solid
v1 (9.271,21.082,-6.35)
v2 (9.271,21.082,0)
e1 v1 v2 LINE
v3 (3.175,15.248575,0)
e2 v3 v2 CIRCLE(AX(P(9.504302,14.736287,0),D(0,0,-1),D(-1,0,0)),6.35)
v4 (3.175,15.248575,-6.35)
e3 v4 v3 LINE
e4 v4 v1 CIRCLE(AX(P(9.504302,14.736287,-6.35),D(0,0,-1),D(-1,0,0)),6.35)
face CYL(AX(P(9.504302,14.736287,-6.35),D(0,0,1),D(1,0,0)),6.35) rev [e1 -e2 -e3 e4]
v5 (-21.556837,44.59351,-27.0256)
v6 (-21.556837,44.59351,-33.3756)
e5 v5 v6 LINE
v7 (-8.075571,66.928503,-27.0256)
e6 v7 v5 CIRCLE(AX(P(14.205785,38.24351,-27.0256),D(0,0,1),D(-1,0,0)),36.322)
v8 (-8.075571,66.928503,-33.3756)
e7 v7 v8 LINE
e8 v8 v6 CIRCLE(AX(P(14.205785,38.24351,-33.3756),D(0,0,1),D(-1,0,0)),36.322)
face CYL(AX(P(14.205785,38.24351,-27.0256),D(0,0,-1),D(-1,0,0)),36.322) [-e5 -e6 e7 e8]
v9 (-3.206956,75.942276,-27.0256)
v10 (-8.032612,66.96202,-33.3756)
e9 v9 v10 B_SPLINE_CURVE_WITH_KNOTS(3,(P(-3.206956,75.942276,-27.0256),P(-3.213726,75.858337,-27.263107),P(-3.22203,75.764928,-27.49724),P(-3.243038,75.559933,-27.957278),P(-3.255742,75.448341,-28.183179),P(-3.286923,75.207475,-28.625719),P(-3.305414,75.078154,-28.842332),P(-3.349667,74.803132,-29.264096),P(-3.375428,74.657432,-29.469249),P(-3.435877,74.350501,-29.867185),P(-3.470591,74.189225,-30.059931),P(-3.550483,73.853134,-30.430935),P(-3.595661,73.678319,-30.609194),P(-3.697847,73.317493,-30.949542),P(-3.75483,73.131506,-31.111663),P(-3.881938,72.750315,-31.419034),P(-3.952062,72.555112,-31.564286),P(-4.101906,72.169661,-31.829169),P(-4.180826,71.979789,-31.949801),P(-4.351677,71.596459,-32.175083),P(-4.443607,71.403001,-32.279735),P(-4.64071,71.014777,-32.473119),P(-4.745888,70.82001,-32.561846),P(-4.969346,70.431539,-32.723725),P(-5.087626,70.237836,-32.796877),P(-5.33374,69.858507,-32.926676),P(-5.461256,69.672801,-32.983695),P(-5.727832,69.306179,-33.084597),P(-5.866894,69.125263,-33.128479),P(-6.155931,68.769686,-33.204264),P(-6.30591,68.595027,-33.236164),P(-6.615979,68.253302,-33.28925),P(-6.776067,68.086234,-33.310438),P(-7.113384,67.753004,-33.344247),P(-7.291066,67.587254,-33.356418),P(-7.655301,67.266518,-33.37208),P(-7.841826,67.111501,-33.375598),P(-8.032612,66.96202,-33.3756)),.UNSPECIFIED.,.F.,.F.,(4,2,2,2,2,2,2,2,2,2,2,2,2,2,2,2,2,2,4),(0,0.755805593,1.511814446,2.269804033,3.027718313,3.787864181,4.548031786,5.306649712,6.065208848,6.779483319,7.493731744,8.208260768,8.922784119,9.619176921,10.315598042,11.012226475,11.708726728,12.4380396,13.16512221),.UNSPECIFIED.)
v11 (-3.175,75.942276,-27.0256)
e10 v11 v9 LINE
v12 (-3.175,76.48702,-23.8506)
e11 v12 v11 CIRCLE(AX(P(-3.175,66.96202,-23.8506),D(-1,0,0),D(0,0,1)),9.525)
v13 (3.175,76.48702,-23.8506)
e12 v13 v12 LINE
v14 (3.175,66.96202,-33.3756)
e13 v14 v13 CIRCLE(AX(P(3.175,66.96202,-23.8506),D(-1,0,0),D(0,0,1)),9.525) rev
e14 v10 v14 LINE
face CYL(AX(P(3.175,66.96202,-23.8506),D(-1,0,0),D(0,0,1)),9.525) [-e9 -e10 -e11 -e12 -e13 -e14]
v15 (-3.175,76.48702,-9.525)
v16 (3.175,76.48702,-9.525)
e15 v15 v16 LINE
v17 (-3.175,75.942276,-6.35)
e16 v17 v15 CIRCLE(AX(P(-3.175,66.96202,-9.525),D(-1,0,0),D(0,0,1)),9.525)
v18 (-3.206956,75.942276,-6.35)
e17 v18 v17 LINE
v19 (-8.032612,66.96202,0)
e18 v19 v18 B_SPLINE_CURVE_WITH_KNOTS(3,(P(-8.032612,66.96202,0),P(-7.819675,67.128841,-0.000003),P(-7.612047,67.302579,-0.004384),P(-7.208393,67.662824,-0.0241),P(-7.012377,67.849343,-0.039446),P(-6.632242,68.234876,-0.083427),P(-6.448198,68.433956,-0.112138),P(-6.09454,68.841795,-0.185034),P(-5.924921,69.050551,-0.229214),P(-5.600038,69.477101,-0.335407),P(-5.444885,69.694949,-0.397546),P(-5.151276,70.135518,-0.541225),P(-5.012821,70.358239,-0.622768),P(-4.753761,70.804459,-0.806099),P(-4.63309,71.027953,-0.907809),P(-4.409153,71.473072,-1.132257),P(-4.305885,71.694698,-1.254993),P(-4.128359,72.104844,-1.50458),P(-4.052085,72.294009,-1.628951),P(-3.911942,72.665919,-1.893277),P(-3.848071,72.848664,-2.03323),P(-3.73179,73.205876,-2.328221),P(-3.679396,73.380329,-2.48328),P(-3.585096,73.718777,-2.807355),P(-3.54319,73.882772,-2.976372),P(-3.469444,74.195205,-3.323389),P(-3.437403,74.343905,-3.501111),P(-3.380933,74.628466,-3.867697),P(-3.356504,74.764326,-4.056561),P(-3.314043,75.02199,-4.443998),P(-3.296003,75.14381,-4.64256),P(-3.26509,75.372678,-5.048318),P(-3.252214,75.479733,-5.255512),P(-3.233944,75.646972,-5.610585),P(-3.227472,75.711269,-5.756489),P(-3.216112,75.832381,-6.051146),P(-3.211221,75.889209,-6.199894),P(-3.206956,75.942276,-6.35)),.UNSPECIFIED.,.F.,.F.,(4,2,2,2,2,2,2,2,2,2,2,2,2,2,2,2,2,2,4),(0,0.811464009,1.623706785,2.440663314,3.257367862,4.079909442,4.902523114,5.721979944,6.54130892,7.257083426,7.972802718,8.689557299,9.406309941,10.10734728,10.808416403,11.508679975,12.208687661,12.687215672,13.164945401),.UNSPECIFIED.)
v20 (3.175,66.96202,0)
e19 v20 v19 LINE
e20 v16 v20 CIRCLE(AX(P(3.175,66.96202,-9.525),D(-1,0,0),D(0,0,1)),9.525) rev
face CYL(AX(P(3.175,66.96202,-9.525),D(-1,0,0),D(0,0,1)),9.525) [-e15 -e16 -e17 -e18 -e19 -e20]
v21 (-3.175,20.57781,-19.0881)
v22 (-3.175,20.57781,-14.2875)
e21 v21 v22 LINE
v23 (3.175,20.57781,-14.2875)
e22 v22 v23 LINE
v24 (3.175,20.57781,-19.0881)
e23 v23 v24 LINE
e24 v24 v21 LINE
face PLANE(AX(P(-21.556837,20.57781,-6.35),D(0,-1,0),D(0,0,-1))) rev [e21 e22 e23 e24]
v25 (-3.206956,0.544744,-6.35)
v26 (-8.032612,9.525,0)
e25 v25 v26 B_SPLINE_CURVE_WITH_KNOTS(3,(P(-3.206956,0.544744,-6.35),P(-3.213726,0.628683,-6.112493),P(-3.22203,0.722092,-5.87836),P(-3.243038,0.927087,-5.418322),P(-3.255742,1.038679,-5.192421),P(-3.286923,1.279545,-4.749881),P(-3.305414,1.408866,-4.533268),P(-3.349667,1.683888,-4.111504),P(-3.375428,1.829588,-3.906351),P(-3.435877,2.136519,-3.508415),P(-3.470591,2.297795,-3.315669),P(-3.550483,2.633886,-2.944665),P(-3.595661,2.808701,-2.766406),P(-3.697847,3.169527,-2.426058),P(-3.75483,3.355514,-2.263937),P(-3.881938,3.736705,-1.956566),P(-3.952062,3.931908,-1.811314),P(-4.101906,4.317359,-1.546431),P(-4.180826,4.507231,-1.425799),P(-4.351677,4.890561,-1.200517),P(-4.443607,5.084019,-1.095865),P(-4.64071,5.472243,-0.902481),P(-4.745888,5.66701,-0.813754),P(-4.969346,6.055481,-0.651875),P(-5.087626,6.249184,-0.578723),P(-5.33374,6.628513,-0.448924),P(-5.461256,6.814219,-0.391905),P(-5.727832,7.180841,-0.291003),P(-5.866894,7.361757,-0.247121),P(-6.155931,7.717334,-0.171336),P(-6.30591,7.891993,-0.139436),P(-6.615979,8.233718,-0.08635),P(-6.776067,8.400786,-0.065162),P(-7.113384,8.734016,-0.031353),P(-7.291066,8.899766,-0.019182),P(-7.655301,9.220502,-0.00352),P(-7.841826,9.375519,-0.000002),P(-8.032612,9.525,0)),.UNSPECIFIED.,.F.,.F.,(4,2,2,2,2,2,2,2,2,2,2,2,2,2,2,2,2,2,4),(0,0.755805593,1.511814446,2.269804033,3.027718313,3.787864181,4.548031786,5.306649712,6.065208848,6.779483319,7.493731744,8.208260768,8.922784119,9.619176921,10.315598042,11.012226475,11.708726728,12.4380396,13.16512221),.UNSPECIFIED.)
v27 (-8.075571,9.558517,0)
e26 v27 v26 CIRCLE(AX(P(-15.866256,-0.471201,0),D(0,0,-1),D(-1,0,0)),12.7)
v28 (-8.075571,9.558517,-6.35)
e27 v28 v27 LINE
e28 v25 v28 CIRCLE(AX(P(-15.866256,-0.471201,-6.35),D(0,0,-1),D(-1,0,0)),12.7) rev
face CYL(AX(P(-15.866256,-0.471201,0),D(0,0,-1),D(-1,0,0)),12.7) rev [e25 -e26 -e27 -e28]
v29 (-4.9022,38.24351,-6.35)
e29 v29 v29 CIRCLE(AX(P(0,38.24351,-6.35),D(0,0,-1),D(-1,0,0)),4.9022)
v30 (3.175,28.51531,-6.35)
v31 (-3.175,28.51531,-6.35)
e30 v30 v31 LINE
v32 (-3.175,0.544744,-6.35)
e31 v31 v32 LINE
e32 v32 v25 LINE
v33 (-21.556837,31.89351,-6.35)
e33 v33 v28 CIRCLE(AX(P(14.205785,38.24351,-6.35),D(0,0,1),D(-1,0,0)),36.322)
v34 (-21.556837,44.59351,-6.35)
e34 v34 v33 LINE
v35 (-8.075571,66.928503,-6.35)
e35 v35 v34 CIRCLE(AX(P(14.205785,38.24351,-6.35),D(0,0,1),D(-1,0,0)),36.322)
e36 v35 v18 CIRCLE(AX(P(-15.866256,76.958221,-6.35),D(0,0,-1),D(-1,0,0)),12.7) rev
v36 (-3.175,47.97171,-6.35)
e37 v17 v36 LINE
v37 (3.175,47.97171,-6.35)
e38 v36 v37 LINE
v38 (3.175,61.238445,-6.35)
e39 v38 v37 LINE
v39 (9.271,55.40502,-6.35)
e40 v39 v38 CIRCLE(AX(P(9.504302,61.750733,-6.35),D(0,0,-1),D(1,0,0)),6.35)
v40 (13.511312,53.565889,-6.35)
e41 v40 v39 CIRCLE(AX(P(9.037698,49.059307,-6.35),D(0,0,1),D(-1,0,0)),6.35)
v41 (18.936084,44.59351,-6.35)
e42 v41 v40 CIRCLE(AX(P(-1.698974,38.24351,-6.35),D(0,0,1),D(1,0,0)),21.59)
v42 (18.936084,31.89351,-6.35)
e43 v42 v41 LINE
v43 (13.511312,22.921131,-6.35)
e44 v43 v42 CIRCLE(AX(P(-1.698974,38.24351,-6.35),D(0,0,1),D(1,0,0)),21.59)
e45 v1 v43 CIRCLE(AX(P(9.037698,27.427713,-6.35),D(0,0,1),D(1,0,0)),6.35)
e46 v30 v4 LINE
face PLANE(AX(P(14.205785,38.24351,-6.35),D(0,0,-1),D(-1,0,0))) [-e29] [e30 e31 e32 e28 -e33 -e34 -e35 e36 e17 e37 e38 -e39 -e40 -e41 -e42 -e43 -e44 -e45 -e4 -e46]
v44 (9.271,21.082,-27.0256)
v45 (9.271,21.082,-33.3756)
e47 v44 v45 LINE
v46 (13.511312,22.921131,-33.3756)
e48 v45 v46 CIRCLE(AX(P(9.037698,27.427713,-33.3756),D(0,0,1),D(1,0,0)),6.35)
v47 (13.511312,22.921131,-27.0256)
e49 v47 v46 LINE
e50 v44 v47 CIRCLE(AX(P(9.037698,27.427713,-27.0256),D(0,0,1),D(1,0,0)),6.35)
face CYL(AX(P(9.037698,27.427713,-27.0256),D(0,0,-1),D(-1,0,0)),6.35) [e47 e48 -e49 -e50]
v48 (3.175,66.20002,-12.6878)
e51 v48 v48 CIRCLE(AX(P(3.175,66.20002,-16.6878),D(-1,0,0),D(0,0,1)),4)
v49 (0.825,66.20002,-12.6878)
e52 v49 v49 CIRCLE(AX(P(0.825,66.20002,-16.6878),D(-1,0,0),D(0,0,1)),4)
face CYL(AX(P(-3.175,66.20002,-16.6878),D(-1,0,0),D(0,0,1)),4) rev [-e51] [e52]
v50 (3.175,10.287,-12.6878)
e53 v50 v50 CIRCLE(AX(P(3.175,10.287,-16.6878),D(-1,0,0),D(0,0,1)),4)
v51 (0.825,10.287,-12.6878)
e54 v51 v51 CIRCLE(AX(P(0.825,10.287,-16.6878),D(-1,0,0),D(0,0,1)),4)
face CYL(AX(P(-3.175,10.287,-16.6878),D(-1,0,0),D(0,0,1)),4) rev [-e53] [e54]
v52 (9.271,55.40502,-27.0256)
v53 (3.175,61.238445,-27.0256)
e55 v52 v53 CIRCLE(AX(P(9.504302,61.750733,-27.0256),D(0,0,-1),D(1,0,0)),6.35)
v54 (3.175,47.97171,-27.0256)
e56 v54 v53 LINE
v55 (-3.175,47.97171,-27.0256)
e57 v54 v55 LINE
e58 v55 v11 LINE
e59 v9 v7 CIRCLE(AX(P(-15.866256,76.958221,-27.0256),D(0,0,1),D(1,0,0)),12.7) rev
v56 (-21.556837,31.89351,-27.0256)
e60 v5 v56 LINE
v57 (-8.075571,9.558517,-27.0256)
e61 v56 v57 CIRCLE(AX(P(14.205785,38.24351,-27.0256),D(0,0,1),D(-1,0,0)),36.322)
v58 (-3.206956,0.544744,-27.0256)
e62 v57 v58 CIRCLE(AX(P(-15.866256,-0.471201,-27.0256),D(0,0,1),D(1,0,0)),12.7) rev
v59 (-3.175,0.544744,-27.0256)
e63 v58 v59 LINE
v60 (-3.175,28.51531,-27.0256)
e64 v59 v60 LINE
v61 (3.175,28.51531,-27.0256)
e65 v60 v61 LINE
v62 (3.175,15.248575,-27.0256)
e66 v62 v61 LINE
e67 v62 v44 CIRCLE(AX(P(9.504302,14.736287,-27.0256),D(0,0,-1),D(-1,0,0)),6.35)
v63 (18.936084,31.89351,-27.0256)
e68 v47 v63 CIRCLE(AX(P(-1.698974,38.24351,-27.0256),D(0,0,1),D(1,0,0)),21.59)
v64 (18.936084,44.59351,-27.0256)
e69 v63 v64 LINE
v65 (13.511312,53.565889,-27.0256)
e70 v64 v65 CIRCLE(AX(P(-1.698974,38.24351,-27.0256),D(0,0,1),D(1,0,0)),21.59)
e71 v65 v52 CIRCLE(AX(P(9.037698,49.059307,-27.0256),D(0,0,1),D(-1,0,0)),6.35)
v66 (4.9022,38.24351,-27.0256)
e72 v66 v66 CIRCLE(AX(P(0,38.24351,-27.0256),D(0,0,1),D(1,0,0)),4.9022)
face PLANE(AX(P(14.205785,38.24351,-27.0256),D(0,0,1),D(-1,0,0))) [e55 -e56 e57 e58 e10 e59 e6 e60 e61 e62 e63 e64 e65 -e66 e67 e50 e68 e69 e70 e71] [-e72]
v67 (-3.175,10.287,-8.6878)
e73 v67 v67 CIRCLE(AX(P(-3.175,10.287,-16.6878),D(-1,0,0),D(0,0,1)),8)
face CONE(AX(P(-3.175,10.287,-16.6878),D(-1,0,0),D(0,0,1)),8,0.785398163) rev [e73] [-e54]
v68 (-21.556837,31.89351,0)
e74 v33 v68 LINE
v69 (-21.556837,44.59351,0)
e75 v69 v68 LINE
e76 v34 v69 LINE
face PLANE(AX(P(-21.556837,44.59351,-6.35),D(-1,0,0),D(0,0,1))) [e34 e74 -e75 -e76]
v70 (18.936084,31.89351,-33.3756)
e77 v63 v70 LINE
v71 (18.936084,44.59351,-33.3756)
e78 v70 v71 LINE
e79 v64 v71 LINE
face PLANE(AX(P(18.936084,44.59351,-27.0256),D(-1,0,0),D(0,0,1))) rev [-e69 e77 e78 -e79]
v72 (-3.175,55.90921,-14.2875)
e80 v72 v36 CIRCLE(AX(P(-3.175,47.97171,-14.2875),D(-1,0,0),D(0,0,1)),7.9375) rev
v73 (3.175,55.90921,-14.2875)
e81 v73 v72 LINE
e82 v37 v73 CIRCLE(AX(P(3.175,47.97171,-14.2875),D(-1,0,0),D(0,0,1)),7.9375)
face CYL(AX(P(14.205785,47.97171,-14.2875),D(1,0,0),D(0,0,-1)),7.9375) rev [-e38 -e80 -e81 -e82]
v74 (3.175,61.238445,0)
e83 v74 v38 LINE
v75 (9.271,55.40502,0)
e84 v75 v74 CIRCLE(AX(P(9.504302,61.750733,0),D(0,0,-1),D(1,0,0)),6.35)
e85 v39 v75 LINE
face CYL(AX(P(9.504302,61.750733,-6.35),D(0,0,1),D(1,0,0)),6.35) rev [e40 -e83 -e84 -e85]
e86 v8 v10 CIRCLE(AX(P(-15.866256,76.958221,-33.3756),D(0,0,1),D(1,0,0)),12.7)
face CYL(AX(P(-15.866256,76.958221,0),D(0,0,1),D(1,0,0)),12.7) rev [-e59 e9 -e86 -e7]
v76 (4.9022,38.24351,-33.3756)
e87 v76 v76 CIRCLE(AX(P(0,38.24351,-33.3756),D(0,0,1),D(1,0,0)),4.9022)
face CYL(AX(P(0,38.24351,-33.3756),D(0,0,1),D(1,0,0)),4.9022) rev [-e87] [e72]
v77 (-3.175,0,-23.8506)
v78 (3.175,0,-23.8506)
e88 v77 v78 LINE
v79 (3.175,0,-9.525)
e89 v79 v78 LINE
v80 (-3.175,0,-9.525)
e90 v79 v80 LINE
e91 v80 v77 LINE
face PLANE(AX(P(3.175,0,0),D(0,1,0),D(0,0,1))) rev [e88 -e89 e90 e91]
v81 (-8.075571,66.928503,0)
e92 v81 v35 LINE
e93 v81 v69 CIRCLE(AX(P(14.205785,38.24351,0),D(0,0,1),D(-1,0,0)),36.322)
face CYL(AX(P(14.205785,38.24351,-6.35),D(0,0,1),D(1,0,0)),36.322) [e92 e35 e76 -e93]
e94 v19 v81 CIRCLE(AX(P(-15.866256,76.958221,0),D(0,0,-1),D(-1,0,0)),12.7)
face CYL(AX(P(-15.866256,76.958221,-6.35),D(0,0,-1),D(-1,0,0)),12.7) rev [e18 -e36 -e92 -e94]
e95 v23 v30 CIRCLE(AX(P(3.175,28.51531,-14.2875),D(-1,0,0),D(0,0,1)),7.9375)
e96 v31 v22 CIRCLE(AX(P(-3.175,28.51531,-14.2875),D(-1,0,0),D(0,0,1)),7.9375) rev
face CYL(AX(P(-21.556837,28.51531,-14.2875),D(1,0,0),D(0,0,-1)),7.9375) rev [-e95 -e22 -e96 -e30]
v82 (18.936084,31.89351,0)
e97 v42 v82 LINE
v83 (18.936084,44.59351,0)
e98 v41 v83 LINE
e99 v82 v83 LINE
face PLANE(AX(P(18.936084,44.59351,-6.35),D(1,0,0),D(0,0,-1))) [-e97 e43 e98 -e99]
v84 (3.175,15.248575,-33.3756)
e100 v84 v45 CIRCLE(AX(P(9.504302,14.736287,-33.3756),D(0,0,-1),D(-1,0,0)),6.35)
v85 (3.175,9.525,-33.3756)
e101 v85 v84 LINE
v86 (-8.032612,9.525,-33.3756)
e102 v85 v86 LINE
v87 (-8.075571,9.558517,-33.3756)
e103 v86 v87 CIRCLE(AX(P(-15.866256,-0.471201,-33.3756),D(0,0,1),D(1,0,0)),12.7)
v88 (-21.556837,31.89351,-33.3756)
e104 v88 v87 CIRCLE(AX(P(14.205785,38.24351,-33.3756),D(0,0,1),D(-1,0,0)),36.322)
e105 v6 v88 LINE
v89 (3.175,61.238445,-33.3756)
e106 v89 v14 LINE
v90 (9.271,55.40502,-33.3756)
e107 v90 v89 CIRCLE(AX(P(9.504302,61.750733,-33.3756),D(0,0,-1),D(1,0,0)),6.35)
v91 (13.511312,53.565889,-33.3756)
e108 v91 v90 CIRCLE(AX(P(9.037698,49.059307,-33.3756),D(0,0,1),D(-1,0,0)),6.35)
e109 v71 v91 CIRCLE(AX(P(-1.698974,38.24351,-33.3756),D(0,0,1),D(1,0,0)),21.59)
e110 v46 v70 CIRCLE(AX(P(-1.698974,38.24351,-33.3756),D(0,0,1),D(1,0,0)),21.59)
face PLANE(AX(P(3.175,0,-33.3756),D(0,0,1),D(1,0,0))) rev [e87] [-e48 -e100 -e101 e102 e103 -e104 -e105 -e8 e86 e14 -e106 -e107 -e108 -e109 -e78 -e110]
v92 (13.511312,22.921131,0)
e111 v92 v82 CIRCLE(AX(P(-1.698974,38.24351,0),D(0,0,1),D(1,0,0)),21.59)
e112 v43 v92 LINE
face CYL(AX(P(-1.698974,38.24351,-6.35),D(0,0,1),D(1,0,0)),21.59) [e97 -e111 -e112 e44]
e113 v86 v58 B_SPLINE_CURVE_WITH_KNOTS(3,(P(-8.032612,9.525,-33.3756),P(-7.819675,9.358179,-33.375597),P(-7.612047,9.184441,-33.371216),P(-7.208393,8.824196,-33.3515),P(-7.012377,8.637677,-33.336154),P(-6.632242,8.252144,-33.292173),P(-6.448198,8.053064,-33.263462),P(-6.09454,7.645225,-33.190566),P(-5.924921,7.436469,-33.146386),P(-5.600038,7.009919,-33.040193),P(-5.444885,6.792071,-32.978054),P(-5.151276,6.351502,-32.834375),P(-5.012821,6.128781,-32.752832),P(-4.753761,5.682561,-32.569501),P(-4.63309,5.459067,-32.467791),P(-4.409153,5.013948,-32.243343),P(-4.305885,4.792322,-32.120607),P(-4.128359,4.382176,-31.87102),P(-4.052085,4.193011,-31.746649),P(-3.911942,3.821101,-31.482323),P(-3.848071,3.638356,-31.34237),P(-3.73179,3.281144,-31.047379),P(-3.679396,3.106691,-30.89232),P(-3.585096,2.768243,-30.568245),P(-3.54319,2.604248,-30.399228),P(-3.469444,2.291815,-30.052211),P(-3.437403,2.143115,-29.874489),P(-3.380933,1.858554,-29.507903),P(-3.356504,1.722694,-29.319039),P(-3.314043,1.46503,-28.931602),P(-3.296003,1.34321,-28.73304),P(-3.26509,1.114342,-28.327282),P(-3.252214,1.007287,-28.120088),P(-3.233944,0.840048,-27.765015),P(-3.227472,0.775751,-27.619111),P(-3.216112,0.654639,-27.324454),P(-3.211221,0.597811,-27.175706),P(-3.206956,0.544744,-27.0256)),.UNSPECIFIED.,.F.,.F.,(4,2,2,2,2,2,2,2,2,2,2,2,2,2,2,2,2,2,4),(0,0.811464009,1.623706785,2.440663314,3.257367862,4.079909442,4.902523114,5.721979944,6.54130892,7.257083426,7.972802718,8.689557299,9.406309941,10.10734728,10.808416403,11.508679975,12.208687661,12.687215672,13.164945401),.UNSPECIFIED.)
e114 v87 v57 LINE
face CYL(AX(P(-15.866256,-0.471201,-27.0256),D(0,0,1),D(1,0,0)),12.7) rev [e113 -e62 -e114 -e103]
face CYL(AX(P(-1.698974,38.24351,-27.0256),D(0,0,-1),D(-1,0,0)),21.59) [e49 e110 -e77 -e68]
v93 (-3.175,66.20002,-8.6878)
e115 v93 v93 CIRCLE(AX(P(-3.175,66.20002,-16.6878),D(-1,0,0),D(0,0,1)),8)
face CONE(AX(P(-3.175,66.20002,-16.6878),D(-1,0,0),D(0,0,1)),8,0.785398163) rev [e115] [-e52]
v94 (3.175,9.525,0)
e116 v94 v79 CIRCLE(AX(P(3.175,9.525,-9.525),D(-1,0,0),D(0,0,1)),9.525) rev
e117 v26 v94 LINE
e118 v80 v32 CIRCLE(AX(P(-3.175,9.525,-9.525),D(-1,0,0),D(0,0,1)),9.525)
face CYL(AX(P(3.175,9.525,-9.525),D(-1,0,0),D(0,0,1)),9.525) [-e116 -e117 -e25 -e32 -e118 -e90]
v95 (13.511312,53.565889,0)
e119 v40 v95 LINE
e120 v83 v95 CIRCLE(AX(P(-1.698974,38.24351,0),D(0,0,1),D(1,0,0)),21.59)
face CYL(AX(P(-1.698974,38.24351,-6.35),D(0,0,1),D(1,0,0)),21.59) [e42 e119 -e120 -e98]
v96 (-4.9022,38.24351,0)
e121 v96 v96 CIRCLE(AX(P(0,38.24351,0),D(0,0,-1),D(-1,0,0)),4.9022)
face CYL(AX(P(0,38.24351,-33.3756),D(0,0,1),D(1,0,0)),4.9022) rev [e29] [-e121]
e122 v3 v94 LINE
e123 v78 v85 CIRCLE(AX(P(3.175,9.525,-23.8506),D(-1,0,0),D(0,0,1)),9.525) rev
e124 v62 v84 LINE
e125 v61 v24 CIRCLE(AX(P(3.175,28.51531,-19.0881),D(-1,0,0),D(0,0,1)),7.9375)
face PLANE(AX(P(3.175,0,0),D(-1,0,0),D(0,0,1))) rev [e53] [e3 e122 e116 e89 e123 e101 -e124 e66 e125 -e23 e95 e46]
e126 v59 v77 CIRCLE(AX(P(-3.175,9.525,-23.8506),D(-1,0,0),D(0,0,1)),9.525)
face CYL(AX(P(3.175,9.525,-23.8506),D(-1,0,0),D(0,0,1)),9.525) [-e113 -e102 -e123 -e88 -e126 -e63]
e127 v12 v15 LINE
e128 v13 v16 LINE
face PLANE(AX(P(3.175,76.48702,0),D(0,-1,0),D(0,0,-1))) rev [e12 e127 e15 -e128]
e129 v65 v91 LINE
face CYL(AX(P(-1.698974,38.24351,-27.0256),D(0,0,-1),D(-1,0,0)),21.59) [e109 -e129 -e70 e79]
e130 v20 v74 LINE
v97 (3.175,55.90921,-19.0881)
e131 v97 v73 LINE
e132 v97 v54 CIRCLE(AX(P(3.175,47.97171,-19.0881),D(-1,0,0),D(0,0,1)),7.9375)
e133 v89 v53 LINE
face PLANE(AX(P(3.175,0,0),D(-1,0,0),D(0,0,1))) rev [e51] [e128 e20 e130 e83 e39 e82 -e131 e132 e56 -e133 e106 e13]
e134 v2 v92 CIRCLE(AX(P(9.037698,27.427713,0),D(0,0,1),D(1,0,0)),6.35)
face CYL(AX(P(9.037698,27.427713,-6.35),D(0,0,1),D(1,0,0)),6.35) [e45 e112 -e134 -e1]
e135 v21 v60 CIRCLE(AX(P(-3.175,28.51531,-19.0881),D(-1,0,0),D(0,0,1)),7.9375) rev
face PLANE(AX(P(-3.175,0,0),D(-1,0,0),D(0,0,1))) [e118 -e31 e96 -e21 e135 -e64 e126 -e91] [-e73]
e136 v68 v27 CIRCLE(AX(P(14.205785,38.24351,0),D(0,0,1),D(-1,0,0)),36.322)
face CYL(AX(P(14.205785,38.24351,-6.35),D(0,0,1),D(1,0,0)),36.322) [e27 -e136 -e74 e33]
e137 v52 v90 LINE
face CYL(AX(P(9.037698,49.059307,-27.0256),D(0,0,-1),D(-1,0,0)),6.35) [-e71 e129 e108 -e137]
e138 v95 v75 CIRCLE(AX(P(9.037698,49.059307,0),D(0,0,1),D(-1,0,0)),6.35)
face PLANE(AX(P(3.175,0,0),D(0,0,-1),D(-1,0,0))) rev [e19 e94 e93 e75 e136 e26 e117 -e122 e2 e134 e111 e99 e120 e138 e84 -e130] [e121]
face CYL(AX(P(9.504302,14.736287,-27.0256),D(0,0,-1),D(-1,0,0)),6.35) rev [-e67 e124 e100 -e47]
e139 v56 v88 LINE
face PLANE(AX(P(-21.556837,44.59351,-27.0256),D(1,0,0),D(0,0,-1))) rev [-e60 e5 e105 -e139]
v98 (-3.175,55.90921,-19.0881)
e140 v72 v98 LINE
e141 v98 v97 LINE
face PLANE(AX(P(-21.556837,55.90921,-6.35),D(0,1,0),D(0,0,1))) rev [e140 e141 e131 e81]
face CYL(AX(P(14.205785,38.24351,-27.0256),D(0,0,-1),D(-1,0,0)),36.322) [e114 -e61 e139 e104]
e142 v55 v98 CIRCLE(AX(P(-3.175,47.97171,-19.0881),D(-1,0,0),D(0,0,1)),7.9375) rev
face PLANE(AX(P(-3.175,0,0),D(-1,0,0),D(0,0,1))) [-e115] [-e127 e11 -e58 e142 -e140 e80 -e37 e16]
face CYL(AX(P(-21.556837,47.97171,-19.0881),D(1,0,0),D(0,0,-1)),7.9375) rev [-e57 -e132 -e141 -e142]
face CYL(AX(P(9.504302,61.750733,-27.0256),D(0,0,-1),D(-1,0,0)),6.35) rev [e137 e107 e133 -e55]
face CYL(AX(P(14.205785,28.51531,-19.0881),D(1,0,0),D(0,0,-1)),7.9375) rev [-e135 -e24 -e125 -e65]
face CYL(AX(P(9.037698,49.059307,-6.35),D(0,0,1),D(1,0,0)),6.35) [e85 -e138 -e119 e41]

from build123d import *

# Parameters (mm, degrees)
SKETCH2_W                                            = 33.3756
SKETCH2_H                                            = 76.48702
BODY_EXTRUDE_DEPTH                                   = 3.175
ROUND_EXTRUDE_DEPTH                                  = 6.35
SKETCH5_W                                            = 20.6756
SKETCH5_H                                            = 35.3314
RECTANGLE_CUT_DEPTH                                  = 88.03940876
BACK_EDGE_FILLET_R                                   = 12.7
OUTER_FILLET_R                                       = 9.525
INNER_FILLET_R                                       = 7.9375
CSK_FOR_M8_CROSS_COUNTERSUNK_HEAD_SCREW1_D           = 8
CSK_FOR_M8_CROSS_COUNTERSUNK_HEAD_SCREW1_DEPTH       = 33.782
CSK_FOR_M8_CROSS_COUNTERSUNK_HEAD_SCREW1_CSINK_D     = 16
CSK_FOR_M8_CROSS_COUNTERSUNK_HEAD_SCREW1_CSINK_ANGLE = 90
VERTICAL_HOLES_DEPTH                                 = 87.191021329
VERTICAL_HOLES_DEPTH_BACK                            = 87.191021329
SKETCH9_R                                            = 4.9022


with BuildPart() as part:
    # Sketch2 → Body Extrude (new, symmetric)
    with BuildSketch(Plane(origin=(0, 0, 0), x_dir=(0, 0, -1), z_dir=(1, 0, 0))):
        with Locations((16.6878, 38.24351)):
            Rectangle(SKETCH2_W, SKETCH2_H)
    extrude(amount=BODY_EXTRUDE_DEPTH, both=True)

    # Sketch3 → Round Extrude (add)
    with BuildSketch(Plane.XY):
        with BuildLine():
            Line((18.936083517, 44.59351), (18.936083517, 31.89351))
            ThreePointArc((18.936083517, 31.89351), (16.776632986, 27.073011115), (13.511311574, 22.921130557))
            ThreePointArc((13.511311574, 22.921130557), (11.564427885, 21.602067983), (9.271, 21.082))
            ThreePointArc((9.271, 21.082), (4.758252665, 18.954997631), (3.175, 14.224))
            Line((3.175, 14.224), (-3.175, 6.35))
            ThreePointArc((-3.175, 6.35), (-15.275957763, 17.02760796), (-21.556837243, 31.89351))
            Line((-21.556837243, 31.89351), (-21.556837243, 44.59351))
            ThreePointArc((-21.556837243, 44.59351), (-15.275957763, 59.45941204), (-3.175, 70.13702))
            Line((-3.175, 70.13702), (3.175, 62.26302))
            ThreePointArc((3.175, 62.26302), (4.758252665, 57.532022369), (9.271, 55.40502))
            ThreePointArc((9.271, 55.40502), (11.564427885, 54.884952017), (13.511311574, 53.565889443))
            ThreePointArc((13.511311574, 53.565889443), (16.776632986, 49.414008885), (18.936083517, 44.59351))
        make_face()
    round_extrude = extrude(amount=-ROUND_EXTRUDE_DEPTH)

    # Round Extrude Mirrored: Round Extrude across plane
    add(round_extrude.mirror(Plane(origin=(0, 0, -16.6878), x_dir=(1, 0, 0), z_dir=(0, 0, -1))))

    # Sketch5 → Rectangle Cut (cut, through all)
    with BuildSketch(Plane(origin=(3.175, 0, 0), x_dir=(0, 0, -1), z_dir=(1, 0, 0))):
        with Locations((16.6878, 38.24351)):
            Rectangle(SKETCH5_W, SKETCH5_H)
    extrude(amount=-RECTANGLE_CUT_DEPTH, mode=Mode.SUBTRACT)

    # Back Edge Fillet
    # the kernel refuses this fillet: 12.7 mm, written as the material it adds along each edge
    with BuildSketch(Plane(origin=(-3.175, 6.35, -33.3756), x_dir=(-0.8366334248395991, 0.5477631901115323, 0), z_dir=(0, 0, 1)), Plane(origin=(-3.175, 70.13702, 0), x_dir=(-0.8366334248396001, -0.5477631901115311, 0), z_dir=(0, 0, -1))) as back_edge_fillet_piece_1:
        with BuildLine():
            CenterArc((6.881526007, 12.658647204), BACK_EDGE_FILLET_R, 215.339993456, 50.03506631)
            Line((-3.478296257, 5.312622248), (-3.685492702, 5.165701749))
            ThreePointArc((-3.685492702, 5.165701749), (-1.951653019, 2.517179274), (-0.21250489, -0.13913185))
            Line((-0.21250489, -0.13913185), (0.020480732, -0.253172944))
            ThreePointArc((0.020480732, -0.253172944), (2.928744699, -0.135731002), (5.837008667, -0.253172944))
            Line((5.837008667, -0.253172944), (5.857489399, 0))
        make_face()
    extrude(amount=6.35)
    with BuildSketch(Plane(origin=(-3.175, 6.35, 0), x_dir=(-0.8366334248395991, 0.5477631901115323, 0), z_dir=(0, 0, -1)), Plane(origin=(-3.175, 70.13702, -33.3756), x_dir=(-0.8366334248396001, -0.5477631901115311, 0), z_dir=(0, 0, 1))) as back_edge_fillet_piece_2:
        with BuildLine():
            CenterArc((6.881526007, -12.658647204), BACK_EDGE_FILLET_R, 94.624940234, 50.03506631)
            Line((-3.478296257, -5.312622248), (-3.685492702, -5.165701749))
            ThreePointArc((-3.685492702, -5.165701749), (-1.951653019, -2.517179274), (-0.21250489, 0.13913185))
            Line((-0.21250489, 0.13913185), (0.020480732, 0.253172944))
            ThreePointArc((0.020480732, 0.253172944), (2.928744699, 0.135731002), (5.837008667, 0.253172944))
            Line((5.837008667, 0.253172944), (5.857489399, 0))
        make_face()
    extrude(amount=6.35)

    # Outer Fillet
    # the kernel refuses this fillet: 9.525 mm, written as the material it takes off along each edge
    with BuildSketch(Plane(origin=(26.9875, 76.48702, 0), x_dir=(0, 0, -1), z_dir=(-1, 0, 0)), Plane(origin=(-26.9875, 76.48702, -33.3756), x_dir=(0, 0, 1), z_dir=(1, 0, 0)), Plane(origin=(-26.9875, 0, -33.3756), x_dir=(0, 1, 0), z_dir=(1, 0, 0)), Plane(origin=(26.9875, 0, 0), x_dir=(0, 1, 0), z_dir=(-1, 0, 0))) as outer_fillet_piece_1:
        with BuildLine():
            CenterArc((OUTER_FILLET_R, OUTER_FILLET_R), OUTER_FILLET_R, 180, 90)
            Line((0, OUTER_FILLET_R), (0, 0))
            Line((0, 0), (OUTER_FILLET_R, 0))
        make_face()
    extrude(amount=53.975, mode=Mode.SUBTRACT)

    # Inner Fillet
    inner_fillet_edges = [part.edges().sort_by_distance(p)[0] for p in [
        (0, 55.90921, -27.0256),
        (0, 20.57781, -6.35),
        (0, 55.90921, -6.35),
        (0, 20.57781, -27.0256),
    ]]
    fillet(inner_fillet_edges, radius=INNER_FILLET_R)

    # CSK for M8 Cross Countersunk Head Screw1
    with Locations(Plane.ZY.offset(3.175)):
        with Locations((-16.6878, 66.20002), (-16.6878, 10.287)):
            CounterSinkHole(CSK_FOR_M8_CROSS_COUNTERSUNK_HEAD_SCREW1_D / 2, CSK_FOR_M8_CROSS_COUNTERSUNK_HEAD_SCREW1_CSINK_D / 2, depth=CSK_FOR_M8_CROSS_COUNTERSUNK_HEAD_SCREW1_DEPTH, counter_sink_angle=CSK_FOR_M8_CROSS_COUNTERSUNK_HEAD_SCREW1_CSINK_ANGLE)

    # Sketch9 → Vertical Holes (cut, two sides: drawn at the far end of the back side and taken through both)
    with BuildSketch(Plane.XY.offset(-VERTICAL_HOLES_DEPTH_BACK)):
        with Locations((0, 38.24351)):
            Circle(SKETCH9_R)
    extrude(amount=VERTICAL_HOLES_DEPTH + VERTICAL_HOLES_DEPTH_BACK, mode=Mode.SUBTRACT)


solid = part.part
